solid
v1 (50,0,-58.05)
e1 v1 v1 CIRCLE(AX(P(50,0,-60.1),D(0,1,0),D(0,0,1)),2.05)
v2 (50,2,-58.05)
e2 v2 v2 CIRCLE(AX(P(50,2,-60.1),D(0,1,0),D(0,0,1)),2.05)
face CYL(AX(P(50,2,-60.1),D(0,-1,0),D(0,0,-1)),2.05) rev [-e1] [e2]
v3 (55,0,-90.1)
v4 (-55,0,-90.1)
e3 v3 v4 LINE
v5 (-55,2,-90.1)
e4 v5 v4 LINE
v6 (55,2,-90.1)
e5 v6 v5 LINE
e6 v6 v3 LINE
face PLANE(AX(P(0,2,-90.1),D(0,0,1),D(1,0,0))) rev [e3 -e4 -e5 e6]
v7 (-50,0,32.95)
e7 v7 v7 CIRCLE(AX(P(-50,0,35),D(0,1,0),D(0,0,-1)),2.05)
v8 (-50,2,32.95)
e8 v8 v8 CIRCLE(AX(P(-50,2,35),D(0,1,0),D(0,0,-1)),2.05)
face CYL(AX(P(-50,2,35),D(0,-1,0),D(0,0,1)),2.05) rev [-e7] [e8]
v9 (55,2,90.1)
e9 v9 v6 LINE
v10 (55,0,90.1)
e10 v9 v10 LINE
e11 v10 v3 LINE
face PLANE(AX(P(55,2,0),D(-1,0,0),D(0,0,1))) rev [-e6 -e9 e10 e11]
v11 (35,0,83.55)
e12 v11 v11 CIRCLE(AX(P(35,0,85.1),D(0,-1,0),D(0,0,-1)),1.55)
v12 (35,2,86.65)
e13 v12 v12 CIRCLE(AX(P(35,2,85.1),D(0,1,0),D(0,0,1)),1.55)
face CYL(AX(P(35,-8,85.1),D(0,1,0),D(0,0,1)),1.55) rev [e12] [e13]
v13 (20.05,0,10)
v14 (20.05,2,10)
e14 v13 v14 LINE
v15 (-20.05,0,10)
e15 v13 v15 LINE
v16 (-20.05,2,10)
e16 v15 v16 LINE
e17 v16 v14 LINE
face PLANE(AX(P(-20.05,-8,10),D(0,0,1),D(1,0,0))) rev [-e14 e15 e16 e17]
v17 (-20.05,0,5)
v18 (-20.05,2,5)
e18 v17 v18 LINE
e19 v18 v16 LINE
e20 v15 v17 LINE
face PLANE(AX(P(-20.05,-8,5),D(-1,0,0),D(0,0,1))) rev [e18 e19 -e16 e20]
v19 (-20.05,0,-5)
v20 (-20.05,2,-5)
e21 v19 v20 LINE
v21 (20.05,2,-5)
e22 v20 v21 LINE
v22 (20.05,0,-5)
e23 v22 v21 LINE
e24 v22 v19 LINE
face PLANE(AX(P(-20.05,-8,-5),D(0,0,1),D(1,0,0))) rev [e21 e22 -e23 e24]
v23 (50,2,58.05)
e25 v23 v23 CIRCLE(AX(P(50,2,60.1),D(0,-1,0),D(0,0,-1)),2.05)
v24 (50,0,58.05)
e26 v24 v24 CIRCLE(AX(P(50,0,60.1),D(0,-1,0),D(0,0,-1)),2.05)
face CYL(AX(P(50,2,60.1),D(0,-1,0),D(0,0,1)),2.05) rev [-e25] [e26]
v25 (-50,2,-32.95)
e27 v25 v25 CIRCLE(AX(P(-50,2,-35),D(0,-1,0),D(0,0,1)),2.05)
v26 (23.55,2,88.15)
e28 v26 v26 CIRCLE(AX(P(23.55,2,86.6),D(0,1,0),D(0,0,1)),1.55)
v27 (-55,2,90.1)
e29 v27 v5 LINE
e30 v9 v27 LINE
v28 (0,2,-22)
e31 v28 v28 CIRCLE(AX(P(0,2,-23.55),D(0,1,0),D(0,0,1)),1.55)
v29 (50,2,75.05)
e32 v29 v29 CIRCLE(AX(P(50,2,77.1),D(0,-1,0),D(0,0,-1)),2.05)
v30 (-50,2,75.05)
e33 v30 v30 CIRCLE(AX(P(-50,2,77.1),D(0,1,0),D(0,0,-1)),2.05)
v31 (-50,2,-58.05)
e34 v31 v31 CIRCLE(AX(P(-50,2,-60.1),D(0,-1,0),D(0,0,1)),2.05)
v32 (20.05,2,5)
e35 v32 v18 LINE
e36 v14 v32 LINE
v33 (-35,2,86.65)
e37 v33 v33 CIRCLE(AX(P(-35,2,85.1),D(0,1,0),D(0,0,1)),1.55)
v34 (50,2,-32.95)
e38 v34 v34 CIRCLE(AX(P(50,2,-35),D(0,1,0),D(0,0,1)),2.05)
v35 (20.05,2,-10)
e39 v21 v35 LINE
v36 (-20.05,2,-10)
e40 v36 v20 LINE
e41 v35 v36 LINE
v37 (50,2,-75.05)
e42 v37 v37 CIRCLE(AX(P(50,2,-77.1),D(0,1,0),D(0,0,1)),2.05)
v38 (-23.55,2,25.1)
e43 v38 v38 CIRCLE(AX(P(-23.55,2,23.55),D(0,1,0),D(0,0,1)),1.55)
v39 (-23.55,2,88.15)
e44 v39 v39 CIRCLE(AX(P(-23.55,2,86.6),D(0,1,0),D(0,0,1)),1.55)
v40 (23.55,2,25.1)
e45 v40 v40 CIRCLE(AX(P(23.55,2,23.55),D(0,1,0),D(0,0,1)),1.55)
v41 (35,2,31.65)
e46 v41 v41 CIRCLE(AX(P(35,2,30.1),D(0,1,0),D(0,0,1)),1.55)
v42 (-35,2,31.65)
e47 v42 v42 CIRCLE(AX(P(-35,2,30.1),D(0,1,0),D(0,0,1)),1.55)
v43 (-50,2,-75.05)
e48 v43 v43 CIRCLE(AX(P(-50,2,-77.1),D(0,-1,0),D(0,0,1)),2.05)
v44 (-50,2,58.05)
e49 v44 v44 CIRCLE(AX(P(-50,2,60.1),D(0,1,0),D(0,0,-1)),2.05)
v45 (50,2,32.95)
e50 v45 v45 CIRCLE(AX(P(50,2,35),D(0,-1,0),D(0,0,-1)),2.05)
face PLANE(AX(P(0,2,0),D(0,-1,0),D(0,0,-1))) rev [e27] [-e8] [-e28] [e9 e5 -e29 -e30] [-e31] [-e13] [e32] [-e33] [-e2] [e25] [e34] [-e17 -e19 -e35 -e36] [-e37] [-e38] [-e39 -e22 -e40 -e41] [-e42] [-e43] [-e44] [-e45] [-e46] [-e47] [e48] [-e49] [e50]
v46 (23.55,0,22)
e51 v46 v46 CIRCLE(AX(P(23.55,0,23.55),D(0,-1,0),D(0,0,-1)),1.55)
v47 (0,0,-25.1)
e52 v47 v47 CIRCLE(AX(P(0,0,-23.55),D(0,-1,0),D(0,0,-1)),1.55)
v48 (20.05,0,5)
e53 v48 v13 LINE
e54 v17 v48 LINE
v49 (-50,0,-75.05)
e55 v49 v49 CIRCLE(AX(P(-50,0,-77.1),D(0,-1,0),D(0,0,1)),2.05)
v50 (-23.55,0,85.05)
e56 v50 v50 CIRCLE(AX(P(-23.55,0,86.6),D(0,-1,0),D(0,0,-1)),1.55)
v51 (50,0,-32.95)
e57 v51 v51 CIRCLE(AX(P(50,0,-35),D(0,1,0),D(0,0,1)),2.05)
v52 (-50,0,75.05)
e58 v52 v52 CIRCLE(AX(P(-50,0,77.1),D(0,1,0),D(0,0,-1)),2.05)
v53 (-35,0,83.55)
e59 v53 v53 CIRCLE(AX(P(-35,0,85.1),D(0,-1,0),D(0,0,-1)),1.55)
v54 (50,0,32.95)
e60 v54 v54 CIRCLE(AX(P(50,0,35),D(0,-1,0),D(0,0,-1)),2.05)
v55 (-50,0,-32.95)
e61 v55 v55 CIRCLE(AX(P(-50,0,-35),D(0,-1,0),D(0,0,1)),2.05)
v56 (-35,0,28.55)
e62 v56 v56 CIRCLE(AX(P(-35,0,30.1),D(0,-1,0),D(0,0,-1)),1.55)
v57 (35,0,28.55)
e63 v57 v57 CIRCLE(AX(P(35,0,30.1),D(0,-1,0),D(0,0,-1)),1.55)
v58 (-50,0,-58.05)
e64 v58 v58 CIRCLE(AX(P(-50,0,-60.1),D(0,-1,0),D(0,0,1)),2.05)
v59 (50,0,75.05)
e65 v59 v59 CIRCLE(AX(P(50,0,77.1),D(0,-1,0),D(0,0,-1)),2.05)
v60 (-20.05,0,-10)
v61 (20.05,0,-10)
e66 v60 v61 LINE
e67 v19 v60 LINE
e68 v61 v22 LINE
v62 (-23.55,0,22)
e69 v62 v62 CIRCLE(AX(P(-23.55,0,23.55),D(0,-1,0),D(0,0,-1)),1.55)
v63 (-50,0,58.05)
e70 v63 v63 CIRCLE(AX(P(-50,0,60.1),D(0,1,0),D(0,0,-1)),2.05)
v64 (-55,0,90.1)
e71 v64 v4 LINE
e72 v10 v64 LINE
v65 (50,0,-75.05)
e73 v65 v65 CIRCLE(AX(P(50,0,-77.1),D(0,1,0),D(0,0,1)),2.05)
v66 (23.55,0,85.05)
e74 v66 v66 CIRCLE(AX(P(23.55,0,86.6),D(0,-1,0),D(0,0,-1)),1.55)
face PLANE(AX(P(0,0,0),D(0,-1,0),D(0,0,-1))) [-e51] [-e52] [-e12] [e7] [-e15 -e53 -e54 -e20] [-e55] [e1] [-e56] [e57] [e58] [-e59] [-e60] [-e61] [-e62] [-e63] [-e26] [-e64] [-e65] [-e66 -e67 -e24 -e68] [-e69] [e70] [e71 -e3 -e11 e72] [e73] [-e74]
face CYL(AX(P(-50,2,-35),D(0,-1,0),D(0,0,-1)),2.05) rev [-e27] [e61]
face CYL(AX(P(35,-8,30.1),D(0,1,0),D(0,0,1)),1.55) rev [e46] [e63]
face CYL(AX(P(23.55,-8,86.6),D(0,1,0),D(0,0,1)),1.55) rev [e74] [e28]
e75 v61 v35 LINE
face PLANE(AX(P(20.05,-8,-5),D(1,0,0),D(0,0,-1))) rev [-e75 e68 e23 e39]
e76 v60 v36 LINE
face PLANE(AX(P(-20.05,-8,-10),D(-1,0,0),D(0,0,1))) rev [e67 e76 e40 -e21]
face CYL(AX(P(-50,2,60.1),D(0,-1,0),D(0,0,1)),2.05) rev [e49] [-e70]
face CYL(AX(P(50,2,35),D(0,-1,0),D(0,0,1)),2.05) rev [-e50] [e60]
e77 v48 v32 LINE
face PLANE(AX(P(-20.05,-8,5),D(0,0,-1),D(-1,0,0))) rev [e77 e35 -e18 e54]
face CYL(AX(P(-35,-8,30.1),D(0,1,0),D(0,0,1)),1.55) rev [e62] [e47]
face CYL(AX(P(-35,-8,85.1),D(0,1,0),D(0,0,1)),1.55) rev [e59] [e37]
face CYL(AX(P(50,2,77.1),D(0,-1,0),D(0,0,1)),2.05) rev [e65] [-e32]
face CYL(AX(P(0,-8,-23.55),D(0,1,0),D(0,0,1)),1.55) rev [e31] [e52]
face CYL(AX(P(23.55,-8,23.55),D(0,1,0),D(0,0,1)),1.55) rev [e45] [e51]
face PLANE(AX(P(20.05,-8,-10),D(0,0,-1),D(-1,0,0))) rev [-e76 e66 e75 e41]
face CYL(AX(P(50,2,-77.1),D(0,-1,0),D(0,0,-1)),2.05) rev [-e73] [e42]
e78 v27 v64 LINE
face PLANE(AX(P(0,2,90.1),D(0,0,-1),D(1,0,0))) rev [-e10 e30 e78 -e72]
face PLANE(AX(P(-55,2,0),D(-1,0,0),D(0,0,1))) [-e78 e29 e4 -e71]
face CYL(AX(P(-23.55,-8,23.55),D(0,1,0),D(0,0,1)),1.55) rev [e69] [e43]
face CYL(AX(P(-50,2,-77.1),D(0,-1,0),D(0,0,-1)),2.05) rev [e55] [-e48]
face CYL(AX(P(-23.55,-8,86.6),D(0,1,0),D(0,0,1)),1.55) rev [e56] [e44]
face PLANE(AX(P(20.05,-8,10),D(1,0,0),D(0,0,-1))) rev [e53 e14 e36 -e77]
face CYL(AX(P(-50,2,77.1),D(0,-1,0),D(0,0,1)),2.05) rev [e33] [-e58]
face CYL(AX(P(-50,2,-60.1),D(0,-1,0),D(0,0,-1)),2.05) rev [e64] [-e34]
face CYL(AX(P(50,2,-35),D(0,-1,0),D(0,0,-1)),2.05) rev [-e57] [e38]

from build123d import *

# Parameters (mm, degrees)
SKETCH1_W           = 55
SKETCH1_H           = 90.1
SKETCH1_R           = 2.05
BOSS_EXTRUDE2_DEPTH = 2
MIRROR1_OUTLINE_W   = 55
MIRROR1_OUTLINE_H   = 90.1
MIRROR1_OUTLINE_R   = 2.05
MIRROR1_DEPTH       = 2
SKETCH2_W           = 40.1
SKETCH2_H           = 5
CUT_EXTRUDE1_DEPTH  = 10
SKETCH3_R           = 1.55
CUT_EXTRUDE2_DEPTH  = 10


# Read off the part's stored shape, not the designer's step: Mirror1
with BuildPart() as part:
    # Sketch1 → Boss-Extrude2 (new body)
    with BuildSketch(Plane(origin=(0, 0, 0), x_dir=(1, 0, 0), z_dir=(0, 1, 0))):
        with Locations((27.5, 45.05)):
            Rectangle(SKETCH1_W, SKETCH1_H)
        with Locations(Location((50, 77.1, 0), (0, 0, 270))):
            Circle(SKETCH1_R, mode=Mode.SUBTRACT)
        with Locations(Location((50, 60.1, 0), (0, 0, 270))):
            Circle(SKETCH1_R, mode=Mode.SUBTRACT)
        with Locations(Location((50, 35, 0), (0, 0, 270))):
            Circle(SKETCH1_R, mode=Mode.SUBTRACT)
    extrude(amount=BOSS_EXTRUDE2_DEPTH)

    # Mirror1 outline → Mirror1 (add)
    with BuildSketch(Plane(origin=(0, 0, 0), x_dir=(1, 0, 0), z_dir=(0, 1, 0))):
        with Locations((-27.5, 45.05)):
            Rectangle(MIRROR1_OUTLINE_W, MIRROR1_OUTLINE_H)
        with Locations((-50, 35)):
            Circle(MIRROR1_OUTLINE_R, mode=Mode.SUBTRACT)
        with Locations((-50, 60.1)):
            Circle(MIRROR1_OUTLINE_R, mode=Mode.SUBTRACT)
        with Locations((-50, 77.1)):
            Circle(MIRROR1_OUTLINE_R, mode=Mode.SUBTRACT)
    extrude(amount=MIRROR1_DEPTH)

    # Mirror2: part across plane


with BuildPart() as part_1:
    add(part.part)
    add(part.part.mirror(Plane(origin=(0, 2, 0), x_dir=(1, 0, 0), z_dir=(0, 0, -1))))

    # Sketch2 → Cut-Extrude1 (cut)
    with BuildSketch(Plane(origin=(0, 2, 0), x_dir=(1, 0, 0), z_dir=(0, 1, 0))):
        with Locations((0, 7.5)):
            Rectangle(SKETCH2_W, SKETCH2_H)
        with Locations((0, -7.5)):
            Rectangle(SKETCH2_W, SKETCH2_H)
    extrude(amount=-CUT_EXTRUDE1_DEPTH, mode=Mode.SUBTRACT)

    # Sketch3 → Cut-Extrude2 (cut)
    with BuildSketch(Plane(origin=(0, 2, 0), x_dir=(1, 0, 0), z_dir=(0, 1, 0))):
        with Locations(Location((-35, -30.1, 0), (0, 0, 270))):
            Circle(SKETCH3_R)
        with Locations(Location((-35, -85.1, 0), (0, 0, 270))):
            Circle(SKETCH3_R)
        with Locations(Location((35, -30.1, 0), (0, 0, 270))):
            Circle(SKETCH3_R)
        with Locations(Location((35, -85.1, 0), (0, 0, 270))):
            Circle(SKETCH3_R)
        with Locations(Location((0, 23.55, 0), (0, 0, 270))):
            Circle(SKETCH3_R)
        with Locations(Location((23.55, -23.55, 0), (0, 0, 270))):
            Circle(SKETCH3_R)
        with Locations(Location((-23.55, -86.6, 0), (0, 0, 270))):
            Circle(SKETCH3_R)
        with Locations(Location((23.55, -86.6, 0), (0, 0, 270))):
            Circle(SKETCH3_R)
        with Locations(Location((-23.55, -23.55, 0), (0, 0, 270))):
            Circle(SKETCH3_R)
    extrude(amount=-CUT_EXTRUDE2_DEPTH, mode=Mode.SUBTRACT)


solid = part_1.part
